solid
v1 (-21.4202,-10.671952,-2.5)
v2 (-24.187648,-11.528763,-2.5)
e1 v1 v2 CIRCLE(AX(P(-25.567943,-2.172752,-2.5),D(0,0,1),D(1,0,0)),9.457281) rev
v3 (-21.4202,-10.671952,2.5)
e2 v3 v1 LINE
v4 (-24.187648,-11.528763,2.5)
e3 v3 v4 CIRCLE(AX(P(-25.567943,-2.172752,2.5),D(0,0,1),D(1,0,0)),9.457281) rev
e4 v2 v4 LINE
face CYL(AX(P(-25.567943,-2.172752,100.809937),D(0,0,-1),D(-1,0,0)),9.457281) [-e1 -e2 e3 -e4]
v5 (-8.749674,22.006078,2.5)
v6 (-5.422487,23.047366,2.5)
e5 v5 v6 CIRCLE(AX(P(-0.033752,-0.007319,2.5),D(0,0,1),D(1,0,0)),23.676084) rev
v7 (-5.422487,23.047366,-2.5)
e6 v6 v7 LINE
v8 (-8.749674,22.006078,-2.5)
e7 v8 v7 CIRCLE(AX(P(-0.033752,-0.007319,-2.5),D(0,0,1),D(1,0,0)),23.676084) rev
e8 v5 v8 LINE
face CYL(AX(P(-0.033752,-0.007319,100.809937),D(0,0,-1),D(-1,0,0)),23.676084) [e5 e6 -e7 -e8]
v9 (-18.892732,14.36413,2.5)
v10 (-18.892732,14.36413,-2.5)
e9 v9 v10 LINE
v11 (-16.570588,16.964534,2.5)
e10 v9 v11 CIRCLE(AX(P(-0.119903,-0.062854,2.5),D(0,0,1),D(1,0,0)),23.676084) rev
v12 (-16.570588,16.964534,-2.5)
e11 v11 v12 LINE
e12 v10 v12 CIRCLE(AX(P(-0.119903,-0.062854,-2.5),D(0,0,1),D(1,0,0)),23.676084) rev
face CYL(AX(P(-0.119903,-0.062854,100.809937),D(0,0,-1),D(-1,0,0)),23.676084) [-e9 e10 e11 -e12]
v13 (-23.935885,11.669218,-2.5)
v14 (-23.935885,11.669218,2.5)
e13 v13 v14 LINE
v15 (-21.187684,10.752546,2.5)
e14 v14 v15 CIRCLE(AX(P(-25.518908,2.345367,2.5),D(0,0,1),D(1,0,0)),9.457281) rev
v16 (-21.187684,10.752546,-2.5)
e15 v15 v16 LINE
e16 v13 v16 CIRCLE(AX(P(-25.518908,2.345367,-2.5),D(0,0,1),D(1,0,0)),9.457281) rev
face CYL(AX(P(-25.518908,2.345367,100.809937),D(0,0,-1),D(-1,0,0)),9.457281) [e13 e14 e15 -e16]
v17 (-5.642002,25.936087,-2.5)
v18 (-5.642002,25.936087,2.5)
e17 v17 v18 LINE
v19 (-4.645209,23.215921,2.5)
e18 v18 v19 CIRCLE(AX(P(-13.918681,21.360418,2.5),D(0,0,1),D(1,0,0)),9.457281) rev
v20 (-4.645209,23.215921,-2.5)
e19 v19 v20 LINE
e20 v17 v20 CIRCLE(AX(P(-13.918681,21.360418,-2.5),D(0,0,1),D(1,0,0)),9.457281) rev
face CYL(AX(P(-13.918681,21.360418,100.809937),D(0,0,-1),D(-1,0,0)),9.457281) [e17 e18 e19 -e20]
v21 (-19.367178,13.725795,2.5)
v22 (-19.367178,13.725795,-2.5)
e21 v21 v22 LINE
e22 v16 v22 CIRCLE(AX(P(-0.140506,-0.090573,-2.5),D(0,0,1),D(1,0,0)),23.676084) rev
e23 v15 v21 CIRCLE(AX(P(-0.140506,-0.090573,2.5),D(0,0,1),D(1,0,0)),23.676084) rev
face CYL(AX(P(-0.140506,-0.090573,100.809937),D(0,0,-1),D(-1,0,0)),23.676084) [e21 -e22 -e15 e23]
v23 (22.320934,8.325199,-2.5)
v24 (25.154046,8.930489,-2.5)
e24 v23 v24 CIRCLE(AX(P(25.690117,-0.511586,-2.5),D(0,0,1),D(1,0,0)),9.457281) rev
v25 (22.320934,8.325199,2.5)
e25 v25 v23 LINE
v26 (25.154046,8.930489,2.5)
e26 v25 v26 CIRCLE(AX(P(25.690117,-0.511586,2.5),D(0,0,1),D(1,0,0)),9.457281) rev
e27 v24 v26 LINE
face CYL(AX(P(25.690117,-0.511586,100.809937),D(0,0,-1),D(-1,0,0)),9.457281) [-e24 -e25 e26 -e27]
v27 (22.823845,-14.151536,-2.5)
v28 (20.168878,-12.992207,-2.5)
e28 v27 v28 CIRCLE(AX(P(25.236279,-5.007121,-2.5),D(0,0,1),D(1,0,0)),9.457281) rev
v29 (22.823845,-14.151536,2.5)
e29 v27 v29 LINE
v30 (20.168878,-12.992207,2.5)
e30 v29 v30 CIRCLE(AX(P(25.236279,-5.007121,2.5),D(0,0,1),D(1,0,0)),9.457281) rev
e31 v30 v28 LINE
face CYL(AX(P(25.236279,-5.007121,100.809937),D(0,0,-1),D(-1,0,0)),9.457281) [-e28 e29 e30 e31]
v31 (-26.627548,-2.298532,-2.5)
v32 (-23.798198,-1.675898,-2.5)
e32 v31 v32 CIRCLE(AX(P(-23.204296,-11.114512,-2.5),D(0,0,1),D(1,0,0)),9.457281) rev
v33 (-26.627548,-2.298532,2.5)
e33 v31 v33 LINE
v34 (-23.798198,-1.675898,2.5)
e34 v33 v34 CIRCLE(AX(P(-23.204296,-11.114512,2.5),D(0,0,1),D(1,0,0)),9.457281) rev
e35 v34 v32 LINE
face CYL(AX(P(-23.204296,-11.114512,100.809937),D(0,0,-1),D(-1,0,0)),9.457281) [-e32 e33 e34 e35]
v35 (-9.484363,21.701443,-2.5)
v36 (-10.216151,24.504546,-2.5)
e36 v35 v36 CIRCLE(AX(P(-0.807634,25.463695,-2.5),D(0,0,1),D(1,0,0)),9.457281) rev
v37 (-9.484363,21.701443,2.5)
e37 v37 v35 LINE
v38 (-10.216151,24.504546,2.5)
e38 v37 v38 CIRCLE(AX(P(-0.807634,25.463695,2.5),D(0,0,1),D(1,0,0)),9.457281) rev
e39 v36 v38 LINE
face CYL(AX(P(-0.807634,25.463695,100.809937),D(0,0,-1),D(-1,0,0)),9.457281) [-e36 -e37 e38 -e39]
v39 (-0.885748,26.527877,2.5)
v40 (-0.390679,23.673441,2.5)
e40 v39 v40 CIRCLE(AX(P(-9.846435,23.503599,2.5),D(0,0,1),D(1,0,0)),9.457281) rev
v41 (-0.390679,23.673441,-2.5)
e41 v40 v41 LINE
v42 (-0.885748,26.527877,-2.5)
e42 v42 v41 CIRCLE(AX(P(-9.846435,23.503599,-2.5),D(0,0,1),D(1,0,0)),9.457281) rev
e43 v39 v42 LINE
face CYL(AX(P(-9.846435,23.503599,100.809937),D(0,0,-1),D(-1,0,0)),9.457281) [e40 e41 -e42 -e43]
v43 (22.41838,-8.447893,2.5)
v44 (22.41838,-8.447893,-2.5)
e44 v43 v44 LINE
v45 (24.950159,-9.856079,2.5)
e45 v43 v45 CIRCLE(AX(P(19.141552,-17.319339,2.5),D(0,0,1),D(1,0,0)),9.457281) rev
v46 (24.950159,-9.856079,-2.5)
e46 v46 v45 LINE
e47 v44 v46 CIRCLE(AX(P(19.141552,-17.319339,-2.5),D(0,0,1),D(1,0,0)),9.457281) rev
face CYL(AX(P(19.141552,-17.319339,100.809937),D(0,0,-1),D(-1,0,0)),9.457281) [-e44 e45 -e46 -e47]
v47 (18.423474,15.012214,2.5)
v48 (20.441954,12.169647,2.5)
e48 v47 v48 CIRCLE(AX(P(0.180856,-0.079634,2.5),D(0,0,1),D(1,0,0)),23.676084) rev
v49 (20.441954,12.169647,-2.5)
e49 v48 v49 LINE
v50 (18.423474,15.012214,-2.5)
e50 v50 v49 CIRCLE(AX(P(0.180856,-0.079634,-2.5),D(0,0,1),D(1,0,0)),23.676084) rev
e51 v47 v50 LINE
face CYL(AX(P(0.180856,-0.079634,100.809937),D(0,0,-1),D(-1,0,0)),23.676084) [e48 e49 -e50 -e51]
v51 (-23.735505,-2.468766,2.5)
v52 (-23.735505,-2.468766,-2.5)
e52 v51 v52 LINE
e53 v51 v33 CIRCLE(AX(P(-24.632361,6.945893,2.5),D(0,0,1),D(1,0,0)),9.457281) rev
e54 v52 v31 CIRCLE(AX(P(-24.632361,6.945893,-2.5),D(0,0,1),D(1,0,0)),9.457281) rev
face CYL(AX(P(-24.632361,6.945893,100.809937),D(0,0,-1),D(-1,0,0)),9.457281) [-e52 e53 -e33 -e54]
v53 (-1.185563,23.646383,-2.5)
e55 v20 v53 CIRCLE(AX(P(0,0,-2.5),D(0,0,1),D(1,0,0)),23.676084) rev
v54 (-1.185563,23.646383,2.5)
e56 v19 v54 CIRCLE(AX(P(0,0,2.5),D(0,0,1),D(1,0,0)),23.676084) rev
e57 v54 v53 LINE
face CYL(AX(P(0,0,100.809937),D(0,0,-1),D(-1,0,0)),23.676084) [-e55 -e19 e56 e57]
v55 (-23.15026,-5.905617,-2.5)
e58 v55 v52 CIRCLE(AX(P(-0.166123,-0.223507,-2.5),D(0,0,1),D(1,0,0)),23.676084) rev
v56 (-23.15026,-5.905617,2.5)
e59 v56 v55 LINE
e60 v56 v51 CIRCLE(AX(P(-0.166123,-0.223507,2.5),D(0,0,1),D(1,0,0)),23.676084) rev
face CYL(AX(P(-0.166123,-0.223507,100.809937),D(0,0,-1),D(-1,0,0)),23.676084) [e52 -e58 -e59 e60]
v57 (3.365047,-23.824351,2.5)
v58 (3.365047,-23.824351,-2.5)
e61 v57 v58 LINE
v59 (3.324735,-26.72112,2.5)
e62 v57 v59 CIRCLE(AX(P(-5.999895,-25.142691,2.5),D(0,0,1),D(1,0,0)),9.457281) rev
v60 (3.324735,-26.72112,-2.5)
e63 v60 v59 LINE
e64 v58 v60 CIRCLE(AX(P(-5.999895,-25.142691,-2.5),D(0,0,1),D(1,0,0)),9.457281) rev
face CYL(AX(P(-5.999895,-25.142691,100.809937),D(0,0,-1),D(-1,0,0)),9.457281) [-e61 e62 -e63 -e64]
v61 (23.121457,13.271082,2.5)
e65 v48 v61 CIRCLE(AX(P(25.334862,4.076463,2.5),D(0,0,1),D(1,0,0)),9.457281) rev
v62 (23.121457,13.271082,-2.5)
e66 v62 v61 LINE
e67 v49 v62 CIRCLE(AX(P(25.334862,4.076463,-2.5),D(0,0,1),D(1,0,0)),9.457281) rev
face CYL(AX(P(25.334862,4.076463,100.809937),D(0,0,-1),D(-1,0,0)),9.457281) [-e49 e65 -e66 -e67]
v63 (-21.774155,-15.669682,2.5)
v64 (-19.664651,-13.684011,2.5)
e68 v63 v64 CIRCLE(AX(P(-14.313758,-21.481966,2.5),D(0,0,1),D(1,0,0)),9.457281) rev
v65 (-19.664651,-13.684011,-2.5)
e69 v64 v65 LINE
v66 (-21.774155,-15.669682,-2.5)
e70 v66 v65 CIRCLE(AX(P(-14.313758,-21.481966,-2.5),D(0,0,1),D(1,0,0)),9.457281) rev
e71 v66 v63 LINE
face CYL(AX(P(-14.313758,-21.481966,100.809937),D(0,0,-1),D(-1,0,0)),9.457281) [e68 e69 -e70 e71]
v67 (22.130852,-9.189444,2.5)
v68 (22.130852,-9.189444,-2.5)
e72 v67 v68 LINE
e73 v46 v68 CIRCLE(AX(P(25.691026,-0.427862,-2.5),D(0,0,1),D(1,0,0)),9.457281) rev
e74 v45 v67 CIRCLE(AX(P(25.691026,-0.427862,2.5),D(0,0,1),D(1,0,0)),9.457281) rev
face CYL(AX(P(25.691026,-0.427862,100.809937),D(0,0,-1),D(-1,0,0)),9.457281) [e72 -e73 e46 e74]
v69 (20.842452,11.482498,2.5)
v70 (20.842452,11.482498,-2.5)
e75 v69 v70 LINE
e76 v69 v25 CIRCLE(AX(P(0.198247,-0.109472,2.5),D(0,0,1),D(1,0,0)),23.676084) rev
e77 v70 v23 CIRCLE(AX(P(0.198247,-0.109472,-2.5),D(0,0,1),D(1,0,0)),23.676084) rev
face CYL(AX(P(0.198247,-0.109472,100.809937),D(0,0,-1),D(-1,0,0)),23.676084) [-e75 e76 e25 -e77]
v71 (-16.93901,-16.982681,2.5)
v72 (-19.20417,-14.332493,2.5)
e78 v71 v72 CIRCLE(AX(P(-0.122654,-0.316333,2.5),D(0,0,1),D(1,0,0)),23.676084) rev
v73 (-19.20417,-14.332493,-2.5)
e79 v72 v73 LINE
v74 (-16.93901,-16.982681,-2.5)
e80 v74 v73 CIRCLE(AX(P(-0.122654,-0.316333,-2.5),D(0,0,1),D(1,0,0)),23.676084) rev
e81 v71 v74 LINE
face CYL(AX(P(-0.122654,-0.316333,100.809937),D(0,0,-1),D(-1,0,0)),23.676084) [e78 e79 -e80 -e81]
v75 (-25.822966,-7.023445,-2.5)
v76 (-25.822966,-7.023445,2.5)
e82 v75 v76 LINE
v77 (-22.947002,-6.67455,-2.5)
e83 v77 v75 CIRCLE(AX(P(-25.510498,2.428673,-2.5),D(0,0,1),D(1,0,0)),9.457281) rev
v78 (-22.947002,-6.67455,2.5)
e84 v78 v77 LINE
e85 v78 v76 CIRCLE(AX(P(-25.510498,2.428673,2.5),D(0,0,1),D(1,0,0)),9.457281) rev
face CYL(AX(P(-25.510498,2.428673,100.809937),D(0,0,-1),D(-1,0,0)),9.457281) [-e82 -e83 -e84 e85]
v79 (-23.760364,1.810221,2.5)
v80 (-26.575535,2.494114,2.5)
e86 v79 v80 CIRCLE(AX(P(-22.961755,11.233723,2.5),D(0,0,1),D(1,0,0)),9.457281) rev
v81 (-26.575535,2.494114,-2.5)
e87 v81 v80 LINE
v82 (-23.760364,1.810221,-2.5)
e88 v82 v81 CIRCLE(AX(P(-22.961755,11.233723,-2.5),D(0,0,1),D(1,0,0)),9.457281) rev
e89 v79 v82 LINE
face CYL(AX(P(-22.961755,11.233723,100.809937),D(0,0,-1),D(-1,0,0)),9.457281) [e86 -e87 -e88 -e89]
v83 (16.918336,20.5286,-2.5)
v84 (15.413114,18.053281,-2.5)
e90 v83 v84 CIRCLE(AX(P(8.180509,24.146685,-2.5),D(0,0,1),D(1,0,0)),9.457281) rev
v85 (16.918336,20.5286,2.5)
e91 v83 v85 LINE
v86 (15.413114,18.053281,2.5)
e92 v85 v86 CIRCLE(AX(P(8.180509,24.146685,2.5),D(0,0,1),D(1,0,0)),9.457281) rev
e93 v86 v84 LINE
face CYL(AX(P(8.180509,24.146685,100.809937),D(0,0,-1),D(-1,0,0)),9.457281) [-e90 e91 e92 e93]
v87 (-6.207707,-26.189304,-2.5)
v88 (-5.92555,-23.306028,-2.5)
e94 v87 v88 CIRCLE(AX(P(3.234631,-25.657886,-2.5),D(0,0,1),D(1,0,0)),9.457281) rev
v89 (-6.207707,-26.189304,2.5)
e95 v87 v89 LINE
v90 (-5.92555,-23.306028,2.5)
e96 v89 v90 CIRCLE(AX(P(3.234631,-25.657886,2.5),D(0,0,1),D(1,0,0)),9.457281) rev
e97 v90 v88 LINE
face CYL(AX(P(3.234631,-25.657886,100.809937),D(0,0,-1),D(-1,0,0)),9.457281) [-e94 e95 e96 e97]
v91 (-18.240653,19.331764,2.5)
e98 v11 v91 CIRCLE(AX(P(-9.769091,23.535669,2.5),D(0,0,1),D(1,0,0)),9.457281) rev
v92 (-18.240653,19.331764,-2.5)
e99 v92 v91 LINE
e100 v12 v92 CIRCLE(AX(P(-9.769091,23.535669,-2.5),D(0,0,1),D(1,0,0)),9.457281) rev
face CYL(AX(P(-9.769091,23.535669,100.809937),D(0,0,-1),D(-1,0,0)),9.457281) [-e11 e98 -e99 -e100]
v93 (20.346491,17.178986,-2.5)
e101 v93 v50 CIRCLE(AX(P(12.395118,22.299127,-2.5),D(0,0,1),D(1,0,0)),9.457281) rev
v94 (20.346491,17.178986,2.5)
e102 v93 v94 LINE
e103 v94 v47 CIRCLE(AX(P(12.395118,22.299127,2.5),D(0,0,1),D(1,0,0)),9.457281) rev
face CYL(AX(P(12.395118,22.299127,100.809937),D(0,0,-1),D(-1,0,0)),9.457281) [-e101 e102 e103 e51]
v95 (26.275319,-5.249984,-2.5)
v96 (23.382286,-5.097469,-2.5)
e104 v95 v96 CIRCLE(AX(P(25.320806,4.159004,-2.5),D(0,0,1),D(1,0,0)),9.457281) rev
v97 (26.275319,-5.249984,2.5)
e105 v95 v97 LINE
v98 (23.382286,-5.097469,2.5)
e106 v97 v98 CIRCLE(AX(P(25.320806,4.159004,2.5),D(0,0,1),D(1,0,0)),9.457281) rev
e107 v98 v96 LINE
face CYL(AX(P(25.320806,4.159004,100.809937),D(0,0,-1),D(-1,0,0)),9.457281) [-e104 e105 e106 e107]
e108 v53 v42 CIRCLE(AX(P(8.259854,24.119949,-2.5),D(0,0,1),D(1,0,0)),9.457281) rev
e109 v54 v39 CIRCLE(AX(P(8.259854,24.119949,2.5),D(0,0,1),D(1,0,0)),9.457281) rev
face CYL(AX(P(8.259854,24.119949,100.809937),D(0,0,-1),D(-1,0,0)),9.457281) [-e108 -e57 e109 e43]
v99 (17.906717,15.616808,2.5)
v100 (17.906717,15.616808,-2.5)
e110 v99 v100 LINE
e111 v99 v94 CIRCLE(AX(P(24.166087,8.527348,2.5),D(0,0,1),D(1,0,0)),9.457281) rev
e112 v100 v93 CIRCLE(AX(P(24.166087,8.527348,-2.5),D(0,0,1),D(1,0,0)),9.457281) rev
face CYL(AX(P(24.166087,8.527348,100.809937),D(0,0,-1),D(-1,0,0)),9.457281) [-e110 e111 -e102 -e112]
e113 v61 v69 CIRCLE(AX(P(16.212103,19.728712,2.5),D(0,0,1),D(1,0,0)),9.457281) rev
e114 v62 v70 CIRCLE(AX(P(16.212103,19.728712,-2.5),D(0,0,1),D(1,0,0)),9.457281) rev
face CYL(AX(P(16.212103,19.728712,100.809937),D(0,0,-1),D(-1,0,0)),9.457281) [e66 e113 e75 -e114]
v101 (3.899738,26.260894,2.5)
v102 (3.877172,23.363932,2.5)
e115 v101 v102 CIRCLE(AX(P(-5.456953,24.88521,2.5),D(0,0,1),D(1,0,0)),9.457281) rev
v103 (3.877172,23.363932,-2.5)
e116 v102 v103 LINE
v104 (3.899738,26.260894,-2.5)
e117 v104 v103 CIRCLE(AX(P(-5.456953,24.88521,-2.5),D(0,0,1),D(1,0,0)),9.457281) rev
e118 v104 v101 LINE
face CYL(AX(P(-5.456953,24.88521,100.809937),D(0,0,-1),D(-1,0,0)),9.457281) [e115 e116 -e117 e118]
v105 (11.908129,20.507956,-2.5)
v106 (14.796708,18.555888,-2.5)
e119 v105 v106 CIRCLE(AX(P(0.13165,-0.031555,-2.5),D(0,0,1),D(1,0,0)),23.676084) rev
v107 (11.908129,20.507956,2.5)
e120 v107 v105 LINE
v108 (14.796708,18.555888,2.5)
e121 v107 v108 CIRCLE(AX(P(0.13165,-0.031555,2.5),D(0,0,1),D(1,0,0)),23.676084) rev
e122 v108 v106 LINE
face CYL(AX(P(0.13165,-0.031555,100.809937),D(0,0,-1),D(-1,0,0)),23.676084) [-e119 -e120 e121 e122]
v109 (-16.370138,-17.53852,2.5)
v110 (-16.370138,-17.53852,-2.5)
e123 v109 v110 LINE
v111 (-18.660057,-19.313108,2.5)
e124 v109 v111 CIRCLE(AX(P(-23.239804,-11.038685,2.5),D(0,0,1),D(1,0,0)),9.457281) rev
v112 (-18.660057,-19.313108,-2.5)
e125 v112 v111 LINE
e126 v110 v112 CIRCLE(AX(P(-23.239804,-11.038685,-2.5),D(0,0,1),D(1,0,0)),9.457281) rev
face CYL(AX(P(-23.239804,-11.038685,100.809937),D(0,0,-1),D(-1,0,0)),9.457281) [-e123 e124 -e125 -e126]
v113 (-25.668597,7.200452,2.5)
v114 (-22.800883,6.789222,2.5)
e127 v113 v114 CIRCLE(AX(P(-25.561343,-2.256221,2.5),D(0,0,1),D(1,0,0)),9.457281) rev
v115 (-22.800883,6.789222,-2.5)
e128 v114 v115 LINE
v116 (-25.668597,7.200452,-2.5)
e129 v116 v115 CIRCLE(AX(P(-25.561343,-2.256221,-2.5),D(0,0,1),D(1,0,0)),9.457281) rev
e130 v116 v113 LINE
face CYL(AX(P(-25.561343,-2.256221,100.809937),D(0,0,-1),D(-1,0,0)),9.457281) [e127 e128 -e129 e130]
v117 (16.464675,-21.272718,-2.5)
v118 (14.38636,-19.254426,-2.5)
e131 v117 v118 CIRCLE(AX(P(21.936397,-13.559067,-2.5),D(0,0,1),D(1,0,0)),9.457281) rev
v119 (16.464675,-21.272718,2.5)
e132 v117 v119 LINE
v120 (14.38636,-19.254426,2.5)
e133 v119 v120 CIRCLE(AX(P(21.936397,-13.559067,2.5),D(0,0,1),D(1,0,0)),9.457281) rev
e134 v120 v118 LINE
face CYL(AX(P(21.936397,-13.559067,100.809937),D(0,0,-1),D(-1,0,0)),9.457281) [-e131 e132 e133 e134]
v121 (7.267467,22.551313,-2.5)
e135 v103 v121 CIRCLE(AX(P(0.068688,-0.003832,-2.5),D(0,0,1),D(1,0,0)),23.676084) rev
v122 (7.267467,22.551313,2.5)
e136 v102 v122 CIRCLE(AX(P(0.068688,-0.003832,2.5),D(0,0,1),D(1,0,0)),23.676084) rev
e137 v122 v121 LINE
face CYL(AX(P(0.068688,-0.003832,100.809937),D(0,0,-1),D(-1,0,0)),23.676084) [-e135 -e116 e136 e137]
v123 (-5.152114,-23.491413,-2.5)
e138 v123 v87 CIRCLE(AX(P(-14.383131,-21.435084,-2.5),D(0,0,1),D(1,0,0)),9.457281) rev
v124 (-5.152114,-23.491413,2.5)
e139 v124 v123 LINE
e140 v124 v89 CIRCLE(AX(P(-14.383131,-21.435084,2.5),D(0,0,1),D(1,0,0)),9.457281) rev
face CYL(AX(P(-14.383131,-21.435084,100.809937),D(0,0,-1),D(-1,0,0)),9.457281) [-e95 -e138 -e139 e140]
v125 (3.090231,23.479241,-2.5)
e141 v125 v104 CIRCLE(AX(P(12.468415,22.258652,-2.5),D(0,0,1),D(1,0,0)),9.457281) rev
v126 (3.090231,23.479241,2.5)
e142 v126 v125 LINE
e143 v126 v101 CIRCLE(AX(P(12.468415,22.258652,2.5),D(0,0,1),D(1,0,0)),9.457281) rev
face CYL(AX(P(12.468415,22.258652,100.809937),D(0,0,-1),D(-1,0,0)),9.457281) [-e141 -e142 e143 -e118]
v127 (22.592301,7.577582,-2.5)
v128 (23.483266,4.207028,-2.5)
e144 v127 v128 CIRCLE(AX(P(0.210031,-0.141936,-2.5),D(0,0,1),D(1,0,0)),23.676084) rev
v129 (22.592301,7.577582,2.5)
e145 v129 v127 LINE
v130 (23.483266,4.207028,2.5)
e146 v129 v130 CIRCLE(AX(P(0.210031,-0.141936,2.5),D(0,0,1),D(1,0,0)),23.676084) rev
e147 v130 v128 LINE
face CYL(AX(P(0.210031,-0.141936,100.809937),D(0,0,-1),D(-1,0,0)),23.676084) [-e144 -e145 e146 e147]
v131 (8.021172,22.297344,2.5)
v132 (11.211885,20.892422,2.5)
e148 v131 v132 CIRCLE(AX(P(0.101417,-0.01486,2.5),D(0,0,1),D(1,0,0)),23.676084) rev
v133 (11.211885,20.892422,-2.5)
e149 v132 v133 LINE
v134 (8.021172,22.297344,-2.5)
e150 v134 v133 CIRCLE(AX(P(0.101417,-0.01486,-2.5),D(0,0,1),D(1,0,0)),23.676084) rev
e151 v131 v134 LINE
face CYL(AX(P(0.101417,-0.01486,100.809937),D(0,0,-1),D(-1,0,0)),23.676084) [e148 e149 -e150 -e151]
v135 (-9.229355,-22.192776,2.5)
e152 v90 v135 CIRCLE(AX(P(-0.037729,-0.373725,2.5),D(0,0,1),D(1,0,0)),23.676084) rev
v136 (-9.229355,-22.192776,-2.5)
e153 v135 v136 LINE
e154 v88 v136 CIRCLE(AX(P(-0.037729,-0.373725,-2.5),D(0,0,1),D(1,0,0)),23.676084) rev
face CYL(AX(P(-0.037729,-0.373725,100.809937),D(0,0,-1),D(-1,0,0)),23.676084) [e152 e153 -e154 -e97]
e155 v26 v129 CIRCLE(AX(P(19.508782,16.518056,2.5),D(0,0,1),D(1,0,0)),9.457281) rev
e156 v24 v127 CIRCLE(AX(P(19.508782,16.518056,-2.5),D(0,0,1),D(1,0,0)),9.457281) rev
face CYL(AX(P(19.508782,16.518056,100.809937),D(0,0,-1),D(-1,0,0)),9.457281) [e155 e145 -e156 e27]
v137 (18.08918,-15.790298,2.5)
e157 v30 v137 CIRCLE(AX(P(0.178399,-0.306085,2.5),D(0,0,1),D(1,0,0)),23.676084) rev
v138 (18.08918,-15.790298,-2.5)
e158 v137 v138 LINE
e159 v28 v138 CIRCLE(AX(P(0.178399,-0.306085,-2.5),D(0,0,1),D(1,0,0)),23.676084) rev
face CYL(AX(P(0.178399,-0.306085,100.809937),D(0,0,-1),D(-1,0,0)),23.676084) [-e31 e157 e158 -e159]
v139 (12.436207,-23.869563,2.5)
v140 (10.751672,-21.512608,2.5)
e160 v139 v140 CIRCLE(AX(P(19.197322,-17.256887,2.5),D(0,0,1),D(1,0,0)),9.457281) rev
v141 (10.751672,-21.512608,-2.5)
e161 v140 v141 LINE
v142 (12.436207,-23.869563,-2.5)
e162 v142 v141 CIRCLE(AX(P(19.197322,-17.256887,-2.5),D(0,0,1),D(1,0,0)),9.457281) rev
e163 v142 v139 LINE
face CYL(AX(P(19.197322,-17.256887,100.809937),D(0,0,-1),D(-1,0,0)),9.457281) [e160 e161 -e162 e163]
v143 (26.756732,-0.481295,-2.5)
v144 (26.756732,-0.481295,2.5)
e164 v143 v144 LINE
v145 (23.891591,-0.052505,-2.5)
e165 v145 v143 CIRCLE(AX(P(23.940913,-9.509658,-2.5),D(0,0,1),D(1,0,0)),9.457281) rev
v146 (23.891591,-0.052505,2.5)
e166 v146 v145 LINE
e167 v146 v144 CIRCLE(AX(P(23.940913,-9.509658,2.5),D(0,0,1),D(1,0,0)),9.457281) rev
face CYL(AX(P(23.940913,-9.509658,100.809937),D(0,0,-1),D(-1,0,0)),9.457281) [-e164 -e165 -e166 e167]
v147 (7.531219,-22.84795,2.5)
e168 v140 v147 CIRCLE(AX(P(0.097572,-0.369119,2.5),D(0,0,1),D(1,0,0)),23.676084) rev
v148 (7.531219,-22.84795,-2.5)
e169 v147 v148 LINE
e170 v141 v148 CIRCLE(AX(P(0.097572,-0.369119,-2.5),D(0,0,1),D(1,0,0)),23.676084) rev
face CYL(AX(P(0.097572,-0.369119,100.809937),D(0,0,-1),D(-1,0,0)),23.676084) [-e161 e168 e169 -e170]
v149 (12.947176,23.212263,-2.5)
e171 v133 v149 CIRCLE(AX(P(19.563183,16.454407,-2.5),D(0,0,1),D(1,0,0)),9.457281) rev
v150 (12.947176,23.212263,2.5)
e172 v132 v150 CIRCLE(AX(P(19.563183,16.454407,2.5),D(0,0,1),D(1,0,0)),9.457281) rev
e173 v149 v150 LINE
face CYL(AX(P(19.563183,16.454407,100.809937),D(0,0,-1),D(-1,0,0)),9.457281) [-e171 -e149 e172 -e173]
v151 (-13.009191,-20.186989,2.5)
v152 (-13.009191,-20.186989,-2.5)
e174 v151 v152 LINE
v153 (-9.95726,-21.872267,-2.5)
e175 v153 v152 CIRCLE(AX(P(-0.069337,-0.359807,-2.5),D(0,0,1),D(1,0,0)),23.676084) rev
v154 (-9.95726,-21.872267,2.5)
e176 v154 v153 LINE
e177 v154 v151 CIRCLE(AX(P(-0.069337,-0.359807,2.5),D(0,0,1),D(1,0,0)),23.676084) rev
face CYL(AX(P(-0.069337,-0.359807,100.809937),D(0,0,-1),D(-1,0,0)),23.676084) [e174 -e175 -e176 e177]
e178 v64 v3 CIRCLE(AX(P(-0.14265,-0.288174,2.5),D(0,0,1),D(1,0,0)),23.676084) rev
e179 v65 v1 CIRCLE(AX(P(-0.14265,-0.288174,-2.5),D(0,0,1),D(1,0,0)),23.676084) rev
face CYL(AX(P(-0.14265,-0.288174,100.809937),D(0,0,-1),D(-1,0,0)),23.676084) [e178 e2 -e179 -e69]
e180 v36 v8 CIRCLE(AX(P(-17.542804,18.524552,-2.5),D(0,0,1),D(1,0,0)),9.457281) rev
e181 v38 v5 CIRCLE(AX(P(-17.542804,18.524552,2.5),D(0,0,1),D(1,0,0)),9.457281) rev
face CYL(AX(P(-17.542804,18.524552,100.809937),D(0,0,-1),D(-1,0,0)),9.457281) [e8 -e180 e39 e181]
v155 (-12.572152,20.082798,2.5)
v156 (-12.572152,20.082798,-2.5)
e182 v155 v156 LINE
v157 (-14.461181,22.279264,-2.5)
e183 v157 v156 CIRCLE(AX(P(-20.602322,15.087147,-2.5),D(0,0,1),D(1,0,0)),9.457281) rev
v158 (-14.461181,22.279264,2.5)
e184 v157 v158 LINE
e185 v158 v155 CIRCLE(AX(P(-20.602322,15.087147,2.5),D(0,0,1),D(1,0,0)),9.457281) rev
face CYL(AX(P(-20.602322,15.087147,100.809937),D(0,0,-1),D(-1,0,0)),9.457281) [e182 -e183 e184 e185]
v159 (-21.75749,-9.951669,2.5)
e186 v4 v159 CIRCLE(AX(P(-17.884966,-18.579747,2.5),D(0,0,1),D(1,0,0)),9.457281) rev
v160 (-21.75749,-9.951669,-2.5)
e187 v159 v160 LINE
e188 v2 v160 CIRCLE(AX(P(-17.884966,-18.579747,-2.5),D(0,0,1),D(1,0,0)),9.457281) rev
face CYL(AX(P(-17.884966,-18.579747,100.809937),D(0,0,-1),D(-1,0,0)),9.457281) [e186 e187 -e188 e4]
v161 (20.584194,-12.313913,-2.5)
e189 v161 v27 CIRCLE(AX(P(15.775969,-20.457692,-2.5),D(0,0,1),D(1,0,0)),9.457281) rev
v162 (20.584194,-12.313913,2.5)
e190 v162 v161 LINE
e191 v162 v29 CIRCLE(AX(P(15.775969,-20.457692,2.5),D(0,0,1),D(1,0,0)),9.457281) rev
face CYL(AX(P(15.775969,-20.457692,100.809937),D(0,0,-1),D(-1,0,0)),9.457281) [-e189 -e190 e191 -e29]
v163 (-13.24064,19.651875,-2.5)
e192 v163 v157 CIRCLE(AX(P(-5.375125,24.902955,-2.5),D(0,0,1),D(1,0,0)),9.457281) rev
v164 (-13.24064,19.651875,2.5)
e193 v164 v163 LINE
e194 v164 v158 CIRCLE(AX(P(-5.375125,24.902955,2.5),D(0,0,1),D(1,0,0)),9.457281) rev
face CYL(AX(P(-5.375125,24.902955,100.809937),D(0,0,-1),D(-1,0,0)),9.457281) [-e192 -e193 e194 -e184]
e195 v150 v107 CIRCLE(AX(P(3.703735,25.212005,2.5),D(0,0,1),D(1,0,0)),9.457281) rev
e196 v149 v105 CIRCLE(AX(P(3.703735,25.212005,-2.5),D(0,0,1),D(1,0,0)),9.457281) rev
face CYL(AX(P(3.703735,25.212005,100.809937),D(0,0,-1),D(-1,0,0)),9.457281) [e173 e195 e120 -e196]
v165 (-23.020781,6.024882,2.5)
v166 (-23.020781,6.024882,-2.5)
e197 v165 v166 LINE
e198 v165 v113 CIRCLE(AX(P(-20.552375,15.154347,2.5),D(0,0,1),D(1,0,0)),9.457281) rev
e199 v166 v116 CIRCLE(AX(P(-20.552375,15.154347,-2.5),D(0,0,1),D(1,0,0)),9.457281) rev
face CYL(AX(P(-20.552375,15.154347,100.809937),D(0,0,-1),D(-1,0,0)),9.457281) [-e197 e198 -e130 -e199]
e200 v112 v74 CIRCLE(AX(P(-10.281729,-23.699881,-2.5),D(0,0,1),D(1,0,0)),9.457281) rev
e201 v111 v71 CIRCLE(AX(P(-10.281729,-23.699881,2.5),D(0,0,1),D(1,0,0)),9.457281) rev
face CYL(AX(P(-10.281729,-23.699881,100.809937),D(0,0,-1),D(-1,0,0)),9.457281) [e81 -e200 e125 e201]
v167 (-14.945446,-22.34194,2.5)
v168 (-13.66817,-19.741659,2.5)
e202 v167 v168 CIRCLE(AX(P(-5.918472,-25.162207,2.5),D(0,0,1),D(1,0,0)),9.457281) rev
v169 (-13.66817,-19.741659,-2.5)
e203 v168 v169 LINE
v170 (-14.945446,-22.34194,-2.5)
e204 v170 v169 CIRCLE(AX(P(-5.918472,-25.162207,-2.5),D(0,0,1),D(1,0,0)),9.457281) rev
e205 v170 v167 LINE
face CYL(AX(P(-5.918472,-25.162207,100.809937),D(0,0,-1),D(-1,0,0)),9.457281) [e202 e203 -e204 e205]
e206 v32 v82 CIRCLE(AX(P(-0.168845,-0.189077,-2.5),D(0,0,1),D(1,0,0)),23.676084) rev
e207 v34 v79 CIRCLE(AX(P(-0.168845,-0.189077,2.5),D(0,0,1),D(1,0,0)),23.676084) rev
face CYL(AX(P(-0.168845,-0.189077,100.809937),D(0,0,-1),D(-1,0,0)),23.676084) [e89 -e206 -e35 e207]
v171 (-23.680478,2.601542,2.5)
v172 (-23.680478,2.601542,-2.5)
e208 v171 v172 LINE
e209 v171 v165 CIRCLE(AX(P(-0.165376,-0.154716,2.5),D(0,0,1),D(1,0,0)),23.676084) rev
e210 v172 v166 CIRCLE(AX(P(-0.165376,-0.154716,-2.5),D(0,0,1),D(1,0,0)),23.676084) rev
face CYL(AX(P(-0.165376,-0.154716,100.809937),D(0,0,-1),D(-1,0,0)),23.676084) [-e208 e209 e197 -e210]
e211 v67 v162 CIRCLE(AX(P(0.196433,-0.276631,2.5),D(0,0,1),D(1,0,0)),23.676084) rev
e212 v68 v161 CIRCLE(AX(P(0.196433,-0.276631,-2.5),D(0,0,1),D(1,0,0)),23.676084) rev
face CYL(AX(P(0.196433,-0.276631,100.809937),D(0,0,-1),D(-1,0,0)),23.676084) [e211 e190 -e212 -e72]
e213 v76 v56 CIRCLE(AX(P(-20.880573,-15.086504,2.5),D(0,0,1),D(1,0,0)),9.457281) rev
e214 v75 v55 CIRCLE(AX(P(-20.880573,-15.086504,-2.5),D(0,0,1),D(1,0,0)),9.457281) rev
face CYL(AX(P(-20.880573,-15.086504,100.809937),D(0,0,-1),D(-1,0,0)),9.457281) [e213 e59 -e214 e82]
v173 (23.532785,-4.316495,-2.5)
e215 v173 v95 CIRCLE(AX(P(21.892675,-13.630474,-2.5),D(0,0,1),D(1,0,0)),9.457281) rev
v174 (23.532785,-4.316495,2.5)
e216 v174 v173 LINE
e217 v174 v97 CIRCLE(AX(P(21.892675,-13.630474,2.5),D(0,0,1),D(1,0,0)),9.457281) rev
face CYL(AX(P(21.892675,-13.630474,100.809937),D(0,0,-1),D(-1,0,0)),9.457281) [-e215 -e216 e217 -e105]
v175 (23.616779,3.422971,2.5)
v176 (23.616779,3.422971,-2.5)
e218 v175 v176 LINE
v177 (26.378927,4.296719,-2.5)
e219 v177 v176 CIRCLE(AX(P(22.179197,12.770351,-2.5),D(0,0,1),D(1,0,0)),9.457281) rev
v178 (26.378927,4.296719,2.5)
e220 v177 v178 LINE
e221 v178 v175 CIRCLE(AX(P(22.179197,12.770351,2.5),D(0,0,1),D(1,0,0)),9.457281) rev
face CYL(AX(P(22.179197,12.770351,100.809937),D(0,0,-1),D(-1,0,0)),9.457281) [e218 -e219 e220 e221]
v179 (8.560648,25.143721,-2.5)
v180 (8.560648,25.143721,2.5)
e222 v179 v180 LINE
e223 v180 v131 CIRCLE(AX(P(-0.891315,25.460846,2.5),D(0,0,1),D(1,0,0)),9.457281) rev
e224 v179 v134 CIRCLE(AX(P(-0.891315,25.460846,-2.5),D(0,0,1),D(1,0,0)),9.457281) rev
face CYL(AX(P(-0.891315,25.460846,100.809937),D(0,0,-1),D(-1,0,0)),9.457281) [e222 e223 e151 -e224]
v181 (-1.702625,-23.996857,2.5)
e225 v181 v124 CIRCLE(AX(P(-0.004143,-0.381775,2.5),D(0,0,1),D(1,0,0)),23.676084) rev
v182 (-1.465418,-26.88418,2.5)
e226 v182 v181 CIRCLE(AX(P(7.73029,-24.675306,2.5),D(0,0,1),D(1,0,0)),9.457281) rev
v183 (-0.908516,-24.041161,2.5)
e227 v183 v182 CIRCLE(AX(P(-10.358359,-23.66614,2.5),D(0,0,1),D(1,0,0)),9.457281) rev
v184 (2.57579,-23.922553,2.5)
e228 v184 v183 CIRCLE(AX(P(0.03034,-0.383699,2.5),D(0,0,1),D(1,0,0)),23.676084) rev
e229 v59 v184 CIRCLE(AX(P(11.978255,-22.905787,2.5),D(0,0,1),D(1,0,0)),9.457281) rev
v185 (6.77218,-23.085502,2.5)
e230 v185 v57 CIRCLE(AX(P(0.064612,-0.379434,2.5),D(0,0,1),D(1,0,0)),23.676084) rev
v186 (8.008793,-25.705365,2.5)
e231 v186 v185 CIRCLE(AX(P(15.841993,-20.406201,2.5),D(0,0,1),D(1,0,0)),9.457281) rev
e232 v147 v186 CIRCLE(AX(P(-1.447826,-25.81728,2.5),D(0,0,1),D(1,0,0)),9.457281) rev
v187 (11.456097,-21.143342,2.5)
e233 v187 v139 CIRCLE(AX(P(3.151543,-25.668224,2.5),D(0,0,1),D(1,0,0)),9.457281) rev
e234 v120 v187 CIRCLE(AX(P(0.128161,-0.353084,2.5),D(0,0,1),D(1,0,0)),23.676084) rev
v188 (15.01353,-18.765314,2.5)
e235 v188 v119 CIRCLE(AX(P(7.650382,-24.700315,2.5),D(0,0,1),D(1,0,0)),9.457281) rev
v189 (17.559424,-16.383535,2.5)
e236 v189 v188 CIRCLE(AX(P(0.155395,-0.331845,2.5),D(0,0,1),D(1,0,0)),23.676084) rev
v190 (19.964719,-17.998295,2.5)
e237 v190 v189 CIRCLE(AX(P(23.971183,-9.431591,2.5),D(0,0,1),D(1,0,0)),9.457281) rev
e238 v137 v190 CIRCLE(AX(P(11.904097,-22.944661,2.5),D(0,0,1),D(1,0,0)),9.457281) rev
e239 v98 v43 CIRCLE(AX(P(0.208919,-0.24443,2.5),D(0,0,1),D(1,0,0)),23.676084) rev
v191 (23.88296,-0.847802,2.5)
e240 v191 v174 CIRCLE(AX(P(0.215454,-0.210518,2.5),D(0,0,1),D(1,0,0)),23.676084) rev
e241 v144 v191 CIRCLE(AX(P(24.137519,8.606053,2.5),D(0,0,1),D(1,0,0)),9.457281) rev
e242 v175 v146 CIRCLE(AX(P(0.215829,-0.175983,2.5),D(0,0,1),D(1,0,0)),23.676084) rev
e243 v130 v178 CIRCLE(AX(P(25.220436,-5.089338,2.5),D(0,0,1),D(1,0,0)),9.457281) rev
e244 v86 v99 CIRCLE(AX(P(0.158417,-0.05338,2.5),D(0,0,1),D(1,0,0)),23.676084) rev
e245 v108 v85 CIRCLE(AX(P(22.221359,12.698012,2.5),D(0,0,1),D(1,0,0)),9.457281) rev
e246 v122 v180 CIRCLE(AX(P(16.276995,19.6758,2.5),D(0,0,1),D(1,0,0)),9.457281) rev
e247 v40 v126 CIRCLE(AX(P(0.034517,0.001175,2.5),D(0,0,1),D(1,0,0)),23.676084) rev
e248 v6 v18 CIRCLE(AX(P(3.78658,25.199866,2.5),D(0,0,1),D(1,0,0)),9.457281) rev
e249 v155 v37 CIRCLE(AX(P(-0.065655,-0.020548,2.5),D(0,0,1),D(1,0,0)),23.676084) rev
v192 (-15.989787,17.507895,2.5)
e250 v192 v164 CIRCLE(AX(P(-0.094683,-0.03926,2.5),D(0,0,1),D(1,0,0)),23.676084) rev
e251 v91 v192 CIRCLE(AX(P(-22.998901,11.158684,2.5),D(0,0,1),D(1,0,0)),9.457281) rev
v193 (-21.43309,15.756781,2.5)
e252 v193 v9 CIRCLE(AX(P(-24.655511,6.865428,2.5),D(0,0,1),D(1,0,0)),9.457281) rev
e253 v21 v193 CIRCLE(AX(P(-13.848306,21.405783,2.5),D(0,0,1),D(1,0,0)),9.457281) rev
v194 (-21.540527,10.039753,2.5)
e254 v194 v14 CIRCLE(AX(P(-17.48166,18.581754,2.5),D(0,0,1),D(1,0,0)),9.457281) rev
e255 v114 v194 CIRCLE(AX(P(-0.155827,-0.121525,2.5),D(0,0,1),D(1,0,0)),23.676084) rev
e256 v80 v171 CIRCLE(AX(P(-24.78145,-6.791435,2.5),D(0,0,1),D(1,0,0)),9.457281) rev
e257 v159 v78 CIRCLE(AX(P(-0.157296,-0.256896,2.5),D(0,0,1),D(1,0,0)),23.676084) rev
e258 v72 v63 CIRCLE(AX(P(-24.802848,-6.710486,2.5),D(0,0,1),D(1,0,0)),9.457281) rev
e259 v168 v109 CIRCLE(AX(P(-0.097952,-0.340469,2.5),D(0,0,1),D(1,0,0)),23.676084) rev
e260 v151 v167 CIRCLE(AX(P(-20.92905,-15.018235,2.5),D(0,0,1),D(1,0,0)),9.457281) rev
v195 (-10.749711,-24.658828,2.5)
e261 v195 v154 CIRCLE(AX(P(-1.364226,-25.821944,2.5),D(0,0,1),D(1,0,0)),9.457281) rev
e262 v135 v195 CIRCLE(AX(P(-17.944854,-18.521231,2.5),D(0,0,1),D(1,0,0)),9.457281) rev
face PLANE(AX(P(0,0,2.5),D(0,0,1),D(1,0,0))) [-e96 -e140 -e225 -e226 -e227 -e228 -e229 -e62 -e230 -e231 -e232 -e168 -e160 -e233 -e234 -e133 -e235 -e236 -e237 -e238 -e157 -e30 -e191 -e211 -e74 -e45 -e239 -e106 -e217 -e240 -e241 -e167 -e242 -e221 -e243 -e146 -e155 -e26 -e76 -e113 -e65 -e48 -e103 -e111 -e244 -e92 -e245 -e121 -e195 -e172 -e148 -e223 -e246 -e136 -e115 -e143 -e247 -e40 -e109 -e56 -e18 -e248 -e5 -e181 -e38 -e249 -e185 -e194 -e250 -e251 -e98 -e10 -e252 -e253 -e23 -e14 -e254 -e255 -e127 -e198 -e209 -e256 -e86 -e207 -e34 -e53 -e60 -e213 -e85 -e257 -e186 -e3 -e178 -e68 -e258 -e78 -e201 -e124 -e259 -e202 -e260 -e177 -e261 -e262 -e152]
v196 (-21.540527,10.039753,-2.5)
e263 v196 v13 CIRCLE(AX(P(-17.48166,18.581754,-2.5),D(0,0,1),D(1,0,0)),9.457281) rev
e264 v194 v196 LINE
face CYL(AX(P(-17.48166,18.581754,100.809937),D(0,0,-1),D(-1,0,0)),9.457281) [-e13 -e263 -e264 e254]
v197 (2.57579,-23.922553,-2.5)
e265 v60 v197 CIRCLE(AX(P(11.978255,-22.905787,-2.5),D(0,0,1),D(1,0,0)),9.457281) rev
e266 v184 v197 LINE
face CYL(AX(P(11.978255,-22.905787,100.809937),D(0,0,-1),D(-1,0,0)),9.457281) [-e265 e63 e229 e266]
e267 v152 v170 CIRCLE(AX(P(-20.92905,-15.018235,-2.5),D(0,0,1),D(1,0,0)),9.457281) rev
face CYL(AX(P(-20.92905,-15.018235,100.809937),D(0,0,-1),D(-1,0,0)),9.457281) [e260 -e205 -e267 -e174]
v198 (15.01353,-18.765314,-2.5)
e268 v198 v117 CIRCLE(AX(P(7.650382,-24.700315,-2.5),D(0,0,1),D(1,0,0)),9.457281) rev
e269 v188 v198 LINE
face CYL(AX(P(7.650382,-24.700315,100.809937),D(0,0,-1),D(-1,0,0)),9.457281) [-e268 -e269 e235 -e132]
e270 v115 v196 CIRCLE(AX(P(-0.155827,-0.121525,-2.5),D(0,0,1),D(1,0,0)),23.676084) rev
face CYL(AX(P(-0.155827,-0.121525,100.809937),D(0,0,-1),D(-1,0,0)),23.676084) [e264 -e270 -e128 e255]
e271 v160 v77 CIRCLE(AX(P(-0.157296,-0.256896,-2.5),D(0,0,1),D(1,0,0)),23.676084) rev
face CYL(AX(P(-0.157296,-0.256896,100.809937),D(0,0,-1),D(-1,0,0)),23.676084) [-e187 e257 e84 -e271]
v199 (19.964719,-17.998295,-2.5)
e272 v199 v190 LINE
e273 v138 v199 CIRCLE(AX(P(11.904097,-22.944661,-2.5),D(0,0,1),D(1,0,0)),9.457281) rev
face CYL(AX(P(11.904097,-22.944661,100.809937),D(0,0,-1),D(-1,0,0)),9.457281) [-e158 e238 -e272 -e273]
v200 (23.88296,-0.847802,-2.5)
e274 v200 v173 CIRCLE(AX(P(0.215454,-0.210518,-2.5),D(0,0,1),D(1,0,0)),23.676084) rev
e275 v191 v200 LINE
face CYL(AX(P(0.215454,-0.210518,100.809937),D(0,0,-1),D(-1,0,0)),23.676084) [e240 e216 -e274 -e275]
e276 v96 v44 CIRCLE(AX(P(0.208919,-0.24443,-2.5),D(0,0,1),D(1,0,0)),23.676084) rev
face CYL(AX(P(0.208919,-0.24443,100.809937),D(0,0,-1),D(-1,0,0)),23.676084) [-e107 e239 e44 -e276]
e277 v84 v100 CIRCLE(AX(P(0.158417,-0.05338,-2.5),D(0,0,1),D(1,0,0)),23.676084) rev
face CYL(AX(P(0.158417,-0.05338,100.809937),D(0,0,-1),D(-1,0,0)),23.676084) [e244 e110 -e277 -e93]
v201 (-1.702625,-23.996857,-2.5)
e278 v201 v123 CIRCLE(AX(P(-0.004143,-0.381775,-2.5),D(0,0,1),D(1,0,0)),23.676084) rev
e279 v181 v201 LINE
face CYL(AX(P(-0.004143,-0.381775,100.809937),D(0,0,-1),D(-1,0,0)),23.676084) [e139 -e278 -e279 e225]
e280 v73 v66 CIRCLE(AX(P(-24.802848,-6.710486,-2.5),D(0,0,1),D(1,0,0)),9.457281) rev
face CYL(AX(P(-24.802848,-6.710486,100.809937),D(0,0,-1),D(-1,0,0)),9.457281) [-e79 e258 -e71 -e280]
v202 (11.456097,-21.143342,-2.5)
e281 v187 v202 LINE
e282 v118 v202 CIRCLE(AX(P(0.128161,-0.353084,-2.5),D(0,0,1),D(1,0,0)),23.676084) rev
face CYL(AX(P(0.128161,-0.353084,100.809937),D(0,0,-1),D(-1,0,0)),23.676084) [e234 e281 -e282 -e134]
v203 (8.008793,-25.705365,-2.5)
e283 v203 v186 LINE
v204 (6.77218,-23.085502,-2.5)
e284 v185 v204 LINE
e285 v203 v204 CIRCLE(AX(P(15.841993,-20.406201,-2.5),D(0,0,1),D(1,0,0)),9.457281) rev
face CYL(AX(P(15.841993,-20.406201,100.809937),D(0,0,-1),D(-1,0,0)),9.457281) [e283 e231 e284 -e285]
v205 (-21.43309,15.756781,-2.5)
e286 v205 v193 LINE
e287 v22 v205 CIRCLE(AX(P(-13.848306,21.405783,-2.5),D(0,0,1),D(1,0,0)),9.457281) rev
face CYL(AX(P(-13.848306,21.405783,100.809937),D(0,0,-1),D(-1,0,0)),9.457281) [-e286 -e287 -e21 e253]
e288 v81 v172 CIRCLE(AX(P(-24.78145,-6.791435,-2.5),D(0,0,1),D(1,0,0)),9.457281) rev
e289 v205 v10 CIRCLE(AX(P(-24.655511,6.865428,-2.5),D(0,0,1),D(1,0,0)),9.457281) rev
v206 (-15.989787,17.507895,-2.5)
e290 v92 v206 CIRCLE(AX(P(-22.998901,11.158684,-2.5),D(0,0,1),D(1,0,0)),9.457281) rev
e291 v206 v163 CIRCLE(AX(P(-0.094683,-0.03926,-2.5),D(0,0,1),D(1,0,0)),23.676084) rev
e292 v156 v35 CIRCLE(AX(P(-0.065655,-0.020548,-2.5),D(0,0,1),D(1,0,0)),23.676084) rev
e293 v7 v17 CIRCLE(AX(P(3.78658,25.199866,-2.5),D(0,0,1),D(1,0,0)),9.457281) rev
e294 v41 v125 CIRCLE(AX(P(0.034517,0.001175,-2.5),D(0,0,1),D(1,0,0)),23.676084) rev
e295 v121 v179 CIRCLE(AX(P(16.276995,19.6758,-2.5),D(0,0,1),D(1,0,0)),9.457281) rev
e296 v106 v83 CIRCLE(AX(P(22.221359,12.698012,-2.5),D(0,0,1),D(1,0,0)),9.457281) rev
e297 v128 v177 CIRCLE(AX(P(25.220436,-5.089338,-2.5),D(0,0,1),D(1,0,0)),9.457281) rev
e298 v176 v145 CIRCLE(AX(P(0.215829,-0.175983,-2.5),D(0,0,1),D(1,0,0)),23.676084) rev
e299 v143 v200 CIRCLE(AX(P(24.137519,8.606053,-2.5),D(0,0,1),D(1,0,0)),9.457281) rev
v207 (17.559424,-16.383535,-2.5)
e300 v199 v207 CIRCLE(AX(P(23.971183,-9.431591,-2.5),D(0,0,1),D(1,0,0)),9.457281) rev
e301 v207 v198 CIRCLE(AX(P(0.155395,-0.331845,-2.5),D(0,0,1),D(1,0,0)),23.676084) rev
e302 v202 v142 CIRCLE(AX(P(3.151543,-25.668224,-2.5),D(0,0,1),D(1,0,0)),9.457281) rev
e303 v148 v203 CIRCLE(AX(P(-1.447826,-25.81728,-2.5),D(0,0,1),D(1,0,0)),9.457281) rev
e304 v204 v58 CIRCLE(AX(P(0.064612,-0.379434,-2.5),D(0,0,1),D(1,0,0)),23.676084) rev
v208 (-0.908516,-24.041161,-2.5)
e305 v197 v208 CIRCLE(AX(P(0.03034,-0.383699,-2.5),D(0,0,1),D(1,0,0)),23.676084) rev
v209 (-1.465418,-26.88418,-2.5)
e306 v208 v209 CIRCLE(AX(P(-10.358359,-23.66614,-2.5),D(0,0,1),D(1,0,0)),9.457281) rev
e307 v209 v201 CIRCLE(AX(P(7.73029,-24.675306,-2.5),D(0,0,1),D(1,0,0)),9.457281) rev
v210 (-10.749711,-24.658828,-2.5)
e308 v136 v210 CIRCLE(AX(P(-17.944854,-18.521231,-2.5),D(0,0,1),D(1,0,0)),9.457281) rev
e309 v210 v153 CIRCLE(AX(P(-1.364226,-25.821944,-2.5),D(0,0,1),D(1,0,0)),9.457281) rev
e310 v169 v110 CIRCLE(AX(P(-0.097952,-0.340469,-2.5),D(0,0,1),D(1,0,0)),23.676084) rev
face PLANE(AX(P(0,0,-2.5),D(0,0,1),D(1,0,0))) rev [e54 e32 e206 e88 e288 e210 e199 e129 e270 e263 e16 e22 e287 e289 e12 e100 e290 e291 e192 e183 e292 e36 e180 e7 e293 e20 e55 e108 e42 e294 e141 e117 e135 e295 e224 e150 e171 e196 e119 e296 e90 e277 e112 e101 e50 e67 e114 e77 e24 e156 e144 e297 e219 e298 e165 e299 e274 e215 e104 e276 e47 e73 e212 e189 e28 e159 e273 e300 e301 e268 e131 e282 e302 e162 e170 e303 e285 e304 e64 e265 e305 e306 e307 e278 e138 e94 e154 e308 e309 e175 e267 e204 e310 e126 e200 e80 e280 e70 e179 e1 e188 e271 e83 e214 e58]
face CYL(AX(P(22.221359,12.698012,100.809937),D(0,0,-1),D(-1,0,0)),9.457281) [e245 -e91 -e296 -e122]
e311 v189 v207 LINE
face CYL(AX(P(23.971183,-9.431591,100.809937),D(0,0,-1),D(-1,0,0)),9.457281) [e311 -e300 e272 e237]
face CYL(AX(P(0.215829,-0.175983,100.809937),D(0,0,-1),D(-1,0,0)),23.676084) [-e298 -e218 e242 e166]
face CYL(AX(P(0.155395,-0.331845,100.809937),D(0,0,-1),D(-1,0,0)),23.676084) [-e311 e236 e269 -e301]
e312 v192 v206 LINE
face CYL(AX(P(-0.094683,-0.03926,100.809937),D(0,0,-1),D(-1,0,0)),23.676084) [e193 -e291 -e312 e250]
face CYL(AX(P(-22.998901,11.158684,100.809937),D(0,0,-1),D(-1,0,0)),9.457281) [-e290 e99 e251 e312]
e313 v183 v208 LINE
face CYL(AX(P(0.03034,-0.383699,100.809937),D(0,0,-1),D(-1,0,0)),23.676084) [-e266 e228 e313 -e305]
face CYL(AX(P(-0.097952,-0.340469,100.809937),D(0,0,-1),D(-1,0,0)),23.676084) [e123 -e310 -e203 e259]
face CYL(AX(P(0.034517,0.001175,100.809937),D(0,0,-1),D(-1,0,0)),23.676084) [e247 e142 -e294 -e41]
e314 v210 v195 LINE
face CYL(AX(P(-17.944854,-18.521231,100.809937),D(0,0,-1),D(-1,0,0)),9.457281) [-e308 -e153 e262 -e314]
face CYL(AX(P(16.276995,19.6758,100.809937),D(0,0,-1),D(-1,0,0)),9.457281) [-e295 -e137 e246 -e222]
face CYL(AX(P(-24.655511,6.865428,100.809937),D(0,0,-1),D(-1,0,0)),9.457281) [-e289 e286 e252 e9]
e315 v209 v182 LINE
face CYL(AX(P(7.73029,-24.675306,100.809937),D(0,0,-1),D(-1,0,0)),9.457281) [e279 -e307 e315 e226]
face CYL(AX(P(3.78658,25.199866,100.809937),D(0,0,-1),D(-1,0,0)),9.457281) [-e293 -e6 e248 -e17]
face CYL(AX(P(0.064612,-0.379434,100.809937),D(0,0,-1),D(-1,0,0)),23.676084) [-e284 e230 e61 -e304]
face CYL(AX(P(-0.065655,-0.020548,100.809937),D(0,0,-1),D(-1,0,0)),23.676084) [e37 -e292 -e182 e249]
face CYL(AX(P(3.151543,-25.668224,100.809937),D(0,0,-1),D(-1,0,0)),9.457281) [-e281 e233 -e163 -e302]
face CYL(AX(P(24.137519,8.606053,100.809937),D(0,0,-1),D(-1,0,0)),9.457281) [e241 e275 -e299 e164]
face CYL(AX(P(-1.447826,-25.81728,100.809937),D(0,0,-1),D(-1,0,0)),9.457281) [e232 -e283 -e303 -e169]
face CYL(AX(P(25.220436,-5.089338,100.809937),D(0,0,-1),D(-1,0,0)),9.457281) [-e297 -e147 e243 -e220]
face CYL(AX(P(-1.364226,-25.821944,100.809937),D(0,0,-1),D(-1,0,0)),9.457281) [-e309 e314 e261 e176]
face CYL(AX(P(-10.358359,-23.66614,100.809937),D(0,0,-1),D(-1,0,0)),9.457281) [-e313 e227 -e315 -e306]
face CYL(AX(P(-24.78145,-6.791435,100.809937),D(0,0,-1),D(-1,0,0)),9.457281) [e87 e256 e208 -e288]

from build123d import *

# Parameters (mm, degrees)
SKETCH1_R           = 27.75
BOSS_EXTRUDE1_DEPTH = 2.5
CUT_EXTRUDE2_START  = -5
CUT_EXTRUDE2_DEPTH  = 45.561660734
CIRPATTERN7_START   = -2.5
CIRPATTERN7_DEPTH   = 5


# Read off the part's stored shape, not the designer's step: CirPattern7
with BuildPart() as part:
    # Sketch1 → Boss-Extrude1 (new, symmetric)
    with BuildSketch(Plane.XY):
        Circle(SKETCH1_R)
    extrude(amount=BOSS_EXTRUDE1_DEPTH, both=True)

    # Sketch2 → Cut-Extrude2 (cut)
    with BuildSketch(Plane.XY.offset(2.5).offset(CUT_EXTRUDE2_START)):
        with BuildLine():
            Line((-89.477738944, 138.434122816), (-6.339011816, 27.016280817))
            ThreePointArc((-6.339011816, 27.016280817), (-5.280523031, 25.210404562), (-4.64520927, 23.215921174))
            ThreePointArc((-4.64520927, 23.215921174), (-2.923319917, 23.494917872), (-1.18556258, 23.646382525))
            ThreePointArc((-1.18556258, 23.646382525), (-1.058374477, 25.735739063), (-0.474695323, 27.745939601))
            Line((-0.474695323, 27.745939601), (52.825792272, 156.14002625))
            Line((52.825792272, 156.14002625), (18.496309012, 432.048381388))
            Line((18.496309012, 432.048381388), (-123.807222203, 414.342477955))
            Line((-123.807222203, 414.342477955), (-89.477738944, 138.434122816))
        make_face()
    extrude(amount=CUT_EXTRUDE2_DEPTH, mode=Mode.SUBTRACT)

    # CirPattern7 outline → CirPattern7 (cut)
    with BuildSketch(Plane.XY.offset(CIRPATTERN7_START)):
        with BuildLine():
            ThreePointArc((3.090231156, 23.479240771), (3.387839331, 24.901248443), (3.899737771, 26.260894145))
            ThreePointArc((3.899737771, 26.260894145), (4.000041355, 24.811544071), (3.877171664, 23.363932423))
            ThreePointArc((3.877171664, 23.363932423), (5.587296935, 23.020110291), (7.267466816, 22.551312602))
            ThreePointArc((7.267466816, 22.551312602), (7.814201579, 23.897328035), (8.560647715, 25.143720674))
            ThreePointArc((8.560647715, 25.143720674), (8.40054793, 23.699752356), (8.021171765, 22.297343653))
            ThreePointArc((8.021171765, 22.297343653), (9.642422807, 21.653692226), (11.211884607, 20.892422392))
            ThreePointArc((11.211884607, 20.892422392), (11.990173454, 22.119183541), (12.947175892, 23.212263034))
            ThreePointArc((12.947175892, 23.212263034), (12.531818479, 21.820086801), (11.9081293, 20.507955613))
            ThreePointArc((11.9081293, 20.507955613), (13.388397772, 19.585162378), (14.796707697, 18.555888238))
            ThreePointArc((14.796707697, 18.555888238), (15.781535783, 19.623965991), (16.918335679, 20.528599863))
            ThreePointArc((16.918335679, 20.528599863), (16.261070565, 19.232961405), (15.413114258, 18.053280708))
            ThreePointArc((15.413114258, 18.053280708), (16.704823111, 16.881004998), (17.906716922, 15.616808269))
            ThreePointArc((17.906716922, 15.616808269), (19.066431063, 16.491873729), (20.346490732, 17.178986303))
            ThreePointArc((20.346490732, 17.178986303), (19.468442959, 16.021528506), (18.423473536, 15.012214208))
            ThreePointArc((18.423473536, 15.012214208), (19.485106186, 13.628133929), (20.441954027, 12.169646935))
            ThreePointArc((20.441954027, 12.169646935), (21.739280055, 12.823574777), (23.121457326, 13.271081689))
            ThreePointArc((23.121457326, 13.271081689), (22.050848071, 12.289006199), (20.842451711, 11.482498492))
            ThreePointArc((20.842451711, 11.482498492), (21.63988641, 9.931099123), (22.320934405, 8.325198837))
            ThreePointArc((22.320934405, 8.325198837), (23.714175195, 8.736971281), (25.154045753, 8.930489292))
            ThreePointArc((25.154045753, 8.930489292), (23.92528528, 8.155360823), (22.592300834, 7.577581529))
            ThreePointArc((22.592300834, 7.577581529), (23.099907376, 5.908726323), (23.48326608, 4.207027699))
            ThreePointArc((23.48326608, 4.207027699), (24.927641727, 4.363410042), (26.378926948, 4.296719323))
            ThreePointArc((26.378926948, 4.296719323), (25.031508628, 3.753451142), (23.616779314, 3.422970562))
            ThreePointArc((23.616779314, 3.422970562), (23.818242806, 1.690297897), (23.891590756, -0.052505069))
            ThreePointArc((23.891590756, -0.052505069), (25.340677838, -0.156539085), (26.756732221, -0.481295039))
            ThreePointArc((26.756732221, -0.481295039), (25.333963188, -0.775241846), (23.88295957, -0.847801793))
            ThreePointArc((23.88295957, -0.847801793), (23.771804811, -2.588602391), (23.532784543, -4.316494579))
            ThreePointArc((23.532784543, -4.316494579), (24.940008208, -4.677601215), (26.2753186, -5.249984481))
            ThreePointArc((26.2753186, -5.249984481), (24.822927822, -5.285162221), (23.38228635, -5.0974694))
            ThreePointArc((23.38228635, -5.0974694), (22.962085944, -6.790447167), (22.418379767, -8.4478927))
            ThreePointArc((22.418379767, -8.4478927), (23.738510689, -9.054465692), (24.950159115, -9.856079401))
            ThreePointArc((24.950159115, -9.856079401), (23.514827626, -9.631357433), (22.130851702, -9.189444445))
            ThreePointArc((22.130851702, -9.189444445), (21.415111237, -10.780185683), (20.584194314, -12.313912898))
            ThreePointArc((20.584194314, -12.313912898), (21.774802399, -13.14645649), (22.823845482, -14.151536117))
            ThreePointArc((22.823845482, -14.151536117), (21.451706017, -13.67413719), (20.168877767, -12.992207482))
            ThreePointArc((20.168877767, -12.992207482), (19.180601729, -14.429584459), (18.089180414, -15.790298101))
            ThreePointArc((18.089180414, -15.790298101), (19.111998539, -16.822053658), (19.964719171, -17.998295117))
            ThreePointArc((19.964719171, -17.998295117), (18.699873422, -17.283563225), (17.559424, -16.38353458))
            ThreePointArc((17.559424, -16.38353458), (16.330376395, -17.621348817), (15.013529867, -18.76531443))
            ThreePointArc((15.013529867, -18.76531443), (15.835683816, -19.963120479), (16.464674853, -21.272718402))
            ThreePointArc((16.464674853, -21.272718402), (15.347776003, -20.343625616), (14.386360394, -19.254425694))
            ThreePointArc((14.386360394, -19.254425694), (12.956043823, -20.252892823), (11.456096612, -21.143342411))
            ThreePointArc((11.456096612, -21.143342411), (12.05116168, -22.46870048), (12.436206834, -23.869563312))
            ThreePointArc((12.436206834, -23.869563312), (11.503152931, -22.755971439), (10.751671822, -21.512608022))
            ThreePointArc((10.751671822, -21.512608022), (9.166057836, -22.239636488), (7.531219481, -22.847950269))
            ThreePointArc((7.531219481, -22.847950269), (7.880069787, -24.258262259), (8.00879339, -25.705365116))
            ThreePointArc((8.00879339, -25.705365116), (7.289573554, -24.443065915), (6.772180166, -23.085501726))
            ThreePointArc((6.772180166, -23.085501726), (5.082231704, -23.517724236), (3.365047255, -23.824350504))
            ThreePointArc((3.365047255, -23.824350504), (3.456470463, -25.274287827), (3.324735232, -26.721119633))
            ThreePointArc((3.324735232, -26.721119633), (2.84246578, -25.350684439), (2.575789563, -23.922552708))
            ThreePointArc((2.575789563, -23.922552708), (0.835822959, -24.046077275), (-0.908515864, -24.041160809))
            ThreePointArc((-0.908515864, -24.041160809), (-1.077458171, -25.484121288), (-1.465418157, -26.884179678))
            ThreePointArc((-1.465418157, -26.884179678), (-1.695236688, -25.449655405), (-1.702624541, -23.996857461))
            ThreePointArc((-1.702624541, -23.996857461), (-3.436685329, -23.807713904), (-5.152114041, -23.491412724))
            ThreePointArc((-5.152114041, -23.491412724), (-5.575991918, -24.88101842), (-6.207707306, -26.189304365))
            ThreePointArc((-6.207707306, -26.189304365), (-6.177688358, -24.736797805), (-5.925550396, -23.30602777))
            ThreePointArc((-5.925550396, -23.30602777), (-7.597971228, -22.810295317), (-9.229354538, -22.192775603))
            ThreePointArc((-9.229354538, -22.192775603), (-9.894544201, -23.484363447), (-10.749711139, -24.658827561))
            ThreePointArc((-10.749711139, -24.658827561), (-10.460819547, -23.235023468), (-9.957259691, -21.872267467))
            ThreePointArc((-9.957259691, -21.872267467), (-11.514287585, -21.085879369), (-13.009191491, -20.186988713))
            ThreePointArc((-13.009191491, -20.186988713), (-13.894313197, -21.339046008), (-14.945445916, -22.341940047))
            ThreePointArc((-14.945445916, -22.341940047), (-14.406966893, -20.992600658), (-13.668169972, -19.741658791))
            ThreePointArc((-13.668169972, -19.741658791), (-15.059760769, -18.689890207), (-16.370137831, -17.538519694))
            ThreePointArc((-16.370137831, -17.538519694), (-17.44674304, -18.514018371), (-18.660057269, -19.313108496))
            ThreePointArc((-18.660057269, -19.313108496), (-17.889297974, -18.081602688), (-16.939009528, -16.982681256))
            ThreePointArc((-16.939009528, -16.982681256), (-18.120436356, -15.699336894), (-19.204169976, -14.33249252))
            ThreePointArc((-19.204169976, -14.33249252), (-20.437655711, -15.100079248), (-21.774154532, -15.669682045))
            ThreePointArc((-21.774154532, -15.669682045), (-20.795887804, -14.595591428), (-19.664650885, -13.68401067))
            ThreePointArc((-19.664650885, -13.68401067), (-20.597941714, -12.210338274), (-21.420199801, -10.671951541))
            ThreePointArc((-21.420199801, -10.671951541), (-22.770920816, -11.206955453), (-24.187648058, -11.528763419))
            ThreePointArc((-24.187648058, -11.528763419), (-23.033316193, -10.64661015), (-21.757489688, -9.95166902))
            ThreePointArc((-21.757489688, -9.95166902), (-22.412647782, -8.335033634), (-22.947002286, -6.674549558))
            ThreePointArc((-22.947002286, -6.674549558), (-24.371545295, -6.959775187), (-25.822966179, -7.023445149))
            ThreePointArc((-25.822966179, -7.023445149), (-24.529670354, -6.361582359), (-23.150260375, -5.905616839))
            ThreePointArc((-23.150260375, -5.905616839), (-23.506228415, -4.197978453), (-23.735504741, -2.468766359))
            ThreePointArc((-23.735504741, -2.468766359), (-25.188083761, -2.495046318), (-26.627548424, -2.298531872))
            ThreePointArc((-26.627548424, -2.298531872), (-25.23685623, -1.878232376), (-23.79819815, -1.675897571))
            ThreePointArc((-23.79819815, -1.675897571), (-23.843535029, 0.067858911), (-23.760364049, 1.810220724))
            ThreePointArc((-23.760364049, 1.810220724), (-25.194291994, 2.043731094), (-26.575534859, 2.494113813))
            ThreePointArc((-26.575534859, 2.494113813), (-25.132144288, 2.659341243), (-23.68047776, 2.601542124))
            ThreePointArc((-23.68047776, 2.601542124), (-23.413726315, 4.325370935), (-23.020781211, 6.024881525))
            ThreePointArc((-23.020781211, 6.024881525), (-24.389970458, 6.510677009), (-25.668597242, 7.200452329))
            ThreePointArc((-25.668597242, 7.200452329), (-24.218900054, 7.105297148), (-22.800882836, 6.789221817))
            ThreePointArc((-22.800882836, 6.789221817), (-22.230616676, 8.43771768), (-21.540527028, 10.039753379))
            ThreePointArc((-21.540527028, 10.039753379), (-22.800970707, 10.762220109), (-23.935885294, 11.669218084))
            ThreePointArc((-23.935885294, 11.669218084), (-22.52647595, 11.316738658), (-21.187684281, 10.752546037))
            ThreePointArc((-21.187684281, 10.752546037), (-20.332232231, 12.272724938), (-19.367178088, 13.725794999))
            ThreePointArc((-19.367178088, 13.725794999), (-20.478364503, 14.661712301), (-21.433089803, 15.75678127))
            ThreePointArc((-21.433089803, 15.75678127), (-20.109267878, 15.158306577), (-18.892731625, 14.36413028))
            ThreePointArc((-18.892731625, 14.36413028), (-17.779588617, 15.70713242), (-16.570587613, 16.964533976))
            ThreePointArc((-16.570587613, 16.964533976), (-17.496802318, 18.083820698), (-18.240652676, 19.331764243))
            ThreePointArc((-18.240652676, 19.331764243), (-17.044966897, 18.506529753), (-15.989786535, 17.50789526))
            ThreePointArc((-15.989786535, 17.50789526), (-14.654729902, 18.630555443), (-13.240640324, 19.651874574))
            ThreePointArc((-13.240640324, 19.651874574), (-13.952114016, 20.918555919), (-14.461181467, 22.279264108))
            ThreePointArc((-14.461181467, 22.279264108), (-13.432062159, 21.253793536), (-12.572152054, 20.082797781))
            ThreePointArc((-12.572152054, 20.082797781), (-11.058091614, 20.949032787), (-9.484363464, 21.701443455))
            ThreePointArc((-9.484363464, 21.701443455), (-9.958228794, 23.074807243), (-10.216151493, 24.504545795))
            ThreePointArc((-10.216151493, 24.504545795), (-9.386675397, 23.311798609), (-8.749673767, 22.00607836))
            ThreePointArc((-8.749673767, 22.00607836), (-7.105272668, 22.588046681), (-5.422486865, 23.047365789))
            ThreePointArc((-5.422486865, 23.047365789), (-5.643513409, 24.483270978), (-5.642001509, 25.936086919))
            ThreePointArc((-5.642001509, 25.936086919), (-5.972131243, 26.488040866), (-6.339011816, 27.016280817))
            ThreePointArc((-6.339011816, 27.016280817), (3.426332111, -27.537660545), (-0.474695323, 27.745939601))
            ThreePointArc((-0.474695323, 27.745939601), (-0.700942634, 27.143900603), (-0.885748459, 26.527876571))
            ThreePointArc((-0.885748459, 26.527876571), (-0.528265346, 25.119728046), (-0.39067943, 23.673440882))
            ThreePointArc((-0.39067943, 23.673440882), (1.353355237, 23.640498771), (3.090231156, 23.479240771))
        make_face()
    extrude(amount=CIRPATTERN7_DEPTH, mode=Mode.SUBTRACT)


solid = part.part
